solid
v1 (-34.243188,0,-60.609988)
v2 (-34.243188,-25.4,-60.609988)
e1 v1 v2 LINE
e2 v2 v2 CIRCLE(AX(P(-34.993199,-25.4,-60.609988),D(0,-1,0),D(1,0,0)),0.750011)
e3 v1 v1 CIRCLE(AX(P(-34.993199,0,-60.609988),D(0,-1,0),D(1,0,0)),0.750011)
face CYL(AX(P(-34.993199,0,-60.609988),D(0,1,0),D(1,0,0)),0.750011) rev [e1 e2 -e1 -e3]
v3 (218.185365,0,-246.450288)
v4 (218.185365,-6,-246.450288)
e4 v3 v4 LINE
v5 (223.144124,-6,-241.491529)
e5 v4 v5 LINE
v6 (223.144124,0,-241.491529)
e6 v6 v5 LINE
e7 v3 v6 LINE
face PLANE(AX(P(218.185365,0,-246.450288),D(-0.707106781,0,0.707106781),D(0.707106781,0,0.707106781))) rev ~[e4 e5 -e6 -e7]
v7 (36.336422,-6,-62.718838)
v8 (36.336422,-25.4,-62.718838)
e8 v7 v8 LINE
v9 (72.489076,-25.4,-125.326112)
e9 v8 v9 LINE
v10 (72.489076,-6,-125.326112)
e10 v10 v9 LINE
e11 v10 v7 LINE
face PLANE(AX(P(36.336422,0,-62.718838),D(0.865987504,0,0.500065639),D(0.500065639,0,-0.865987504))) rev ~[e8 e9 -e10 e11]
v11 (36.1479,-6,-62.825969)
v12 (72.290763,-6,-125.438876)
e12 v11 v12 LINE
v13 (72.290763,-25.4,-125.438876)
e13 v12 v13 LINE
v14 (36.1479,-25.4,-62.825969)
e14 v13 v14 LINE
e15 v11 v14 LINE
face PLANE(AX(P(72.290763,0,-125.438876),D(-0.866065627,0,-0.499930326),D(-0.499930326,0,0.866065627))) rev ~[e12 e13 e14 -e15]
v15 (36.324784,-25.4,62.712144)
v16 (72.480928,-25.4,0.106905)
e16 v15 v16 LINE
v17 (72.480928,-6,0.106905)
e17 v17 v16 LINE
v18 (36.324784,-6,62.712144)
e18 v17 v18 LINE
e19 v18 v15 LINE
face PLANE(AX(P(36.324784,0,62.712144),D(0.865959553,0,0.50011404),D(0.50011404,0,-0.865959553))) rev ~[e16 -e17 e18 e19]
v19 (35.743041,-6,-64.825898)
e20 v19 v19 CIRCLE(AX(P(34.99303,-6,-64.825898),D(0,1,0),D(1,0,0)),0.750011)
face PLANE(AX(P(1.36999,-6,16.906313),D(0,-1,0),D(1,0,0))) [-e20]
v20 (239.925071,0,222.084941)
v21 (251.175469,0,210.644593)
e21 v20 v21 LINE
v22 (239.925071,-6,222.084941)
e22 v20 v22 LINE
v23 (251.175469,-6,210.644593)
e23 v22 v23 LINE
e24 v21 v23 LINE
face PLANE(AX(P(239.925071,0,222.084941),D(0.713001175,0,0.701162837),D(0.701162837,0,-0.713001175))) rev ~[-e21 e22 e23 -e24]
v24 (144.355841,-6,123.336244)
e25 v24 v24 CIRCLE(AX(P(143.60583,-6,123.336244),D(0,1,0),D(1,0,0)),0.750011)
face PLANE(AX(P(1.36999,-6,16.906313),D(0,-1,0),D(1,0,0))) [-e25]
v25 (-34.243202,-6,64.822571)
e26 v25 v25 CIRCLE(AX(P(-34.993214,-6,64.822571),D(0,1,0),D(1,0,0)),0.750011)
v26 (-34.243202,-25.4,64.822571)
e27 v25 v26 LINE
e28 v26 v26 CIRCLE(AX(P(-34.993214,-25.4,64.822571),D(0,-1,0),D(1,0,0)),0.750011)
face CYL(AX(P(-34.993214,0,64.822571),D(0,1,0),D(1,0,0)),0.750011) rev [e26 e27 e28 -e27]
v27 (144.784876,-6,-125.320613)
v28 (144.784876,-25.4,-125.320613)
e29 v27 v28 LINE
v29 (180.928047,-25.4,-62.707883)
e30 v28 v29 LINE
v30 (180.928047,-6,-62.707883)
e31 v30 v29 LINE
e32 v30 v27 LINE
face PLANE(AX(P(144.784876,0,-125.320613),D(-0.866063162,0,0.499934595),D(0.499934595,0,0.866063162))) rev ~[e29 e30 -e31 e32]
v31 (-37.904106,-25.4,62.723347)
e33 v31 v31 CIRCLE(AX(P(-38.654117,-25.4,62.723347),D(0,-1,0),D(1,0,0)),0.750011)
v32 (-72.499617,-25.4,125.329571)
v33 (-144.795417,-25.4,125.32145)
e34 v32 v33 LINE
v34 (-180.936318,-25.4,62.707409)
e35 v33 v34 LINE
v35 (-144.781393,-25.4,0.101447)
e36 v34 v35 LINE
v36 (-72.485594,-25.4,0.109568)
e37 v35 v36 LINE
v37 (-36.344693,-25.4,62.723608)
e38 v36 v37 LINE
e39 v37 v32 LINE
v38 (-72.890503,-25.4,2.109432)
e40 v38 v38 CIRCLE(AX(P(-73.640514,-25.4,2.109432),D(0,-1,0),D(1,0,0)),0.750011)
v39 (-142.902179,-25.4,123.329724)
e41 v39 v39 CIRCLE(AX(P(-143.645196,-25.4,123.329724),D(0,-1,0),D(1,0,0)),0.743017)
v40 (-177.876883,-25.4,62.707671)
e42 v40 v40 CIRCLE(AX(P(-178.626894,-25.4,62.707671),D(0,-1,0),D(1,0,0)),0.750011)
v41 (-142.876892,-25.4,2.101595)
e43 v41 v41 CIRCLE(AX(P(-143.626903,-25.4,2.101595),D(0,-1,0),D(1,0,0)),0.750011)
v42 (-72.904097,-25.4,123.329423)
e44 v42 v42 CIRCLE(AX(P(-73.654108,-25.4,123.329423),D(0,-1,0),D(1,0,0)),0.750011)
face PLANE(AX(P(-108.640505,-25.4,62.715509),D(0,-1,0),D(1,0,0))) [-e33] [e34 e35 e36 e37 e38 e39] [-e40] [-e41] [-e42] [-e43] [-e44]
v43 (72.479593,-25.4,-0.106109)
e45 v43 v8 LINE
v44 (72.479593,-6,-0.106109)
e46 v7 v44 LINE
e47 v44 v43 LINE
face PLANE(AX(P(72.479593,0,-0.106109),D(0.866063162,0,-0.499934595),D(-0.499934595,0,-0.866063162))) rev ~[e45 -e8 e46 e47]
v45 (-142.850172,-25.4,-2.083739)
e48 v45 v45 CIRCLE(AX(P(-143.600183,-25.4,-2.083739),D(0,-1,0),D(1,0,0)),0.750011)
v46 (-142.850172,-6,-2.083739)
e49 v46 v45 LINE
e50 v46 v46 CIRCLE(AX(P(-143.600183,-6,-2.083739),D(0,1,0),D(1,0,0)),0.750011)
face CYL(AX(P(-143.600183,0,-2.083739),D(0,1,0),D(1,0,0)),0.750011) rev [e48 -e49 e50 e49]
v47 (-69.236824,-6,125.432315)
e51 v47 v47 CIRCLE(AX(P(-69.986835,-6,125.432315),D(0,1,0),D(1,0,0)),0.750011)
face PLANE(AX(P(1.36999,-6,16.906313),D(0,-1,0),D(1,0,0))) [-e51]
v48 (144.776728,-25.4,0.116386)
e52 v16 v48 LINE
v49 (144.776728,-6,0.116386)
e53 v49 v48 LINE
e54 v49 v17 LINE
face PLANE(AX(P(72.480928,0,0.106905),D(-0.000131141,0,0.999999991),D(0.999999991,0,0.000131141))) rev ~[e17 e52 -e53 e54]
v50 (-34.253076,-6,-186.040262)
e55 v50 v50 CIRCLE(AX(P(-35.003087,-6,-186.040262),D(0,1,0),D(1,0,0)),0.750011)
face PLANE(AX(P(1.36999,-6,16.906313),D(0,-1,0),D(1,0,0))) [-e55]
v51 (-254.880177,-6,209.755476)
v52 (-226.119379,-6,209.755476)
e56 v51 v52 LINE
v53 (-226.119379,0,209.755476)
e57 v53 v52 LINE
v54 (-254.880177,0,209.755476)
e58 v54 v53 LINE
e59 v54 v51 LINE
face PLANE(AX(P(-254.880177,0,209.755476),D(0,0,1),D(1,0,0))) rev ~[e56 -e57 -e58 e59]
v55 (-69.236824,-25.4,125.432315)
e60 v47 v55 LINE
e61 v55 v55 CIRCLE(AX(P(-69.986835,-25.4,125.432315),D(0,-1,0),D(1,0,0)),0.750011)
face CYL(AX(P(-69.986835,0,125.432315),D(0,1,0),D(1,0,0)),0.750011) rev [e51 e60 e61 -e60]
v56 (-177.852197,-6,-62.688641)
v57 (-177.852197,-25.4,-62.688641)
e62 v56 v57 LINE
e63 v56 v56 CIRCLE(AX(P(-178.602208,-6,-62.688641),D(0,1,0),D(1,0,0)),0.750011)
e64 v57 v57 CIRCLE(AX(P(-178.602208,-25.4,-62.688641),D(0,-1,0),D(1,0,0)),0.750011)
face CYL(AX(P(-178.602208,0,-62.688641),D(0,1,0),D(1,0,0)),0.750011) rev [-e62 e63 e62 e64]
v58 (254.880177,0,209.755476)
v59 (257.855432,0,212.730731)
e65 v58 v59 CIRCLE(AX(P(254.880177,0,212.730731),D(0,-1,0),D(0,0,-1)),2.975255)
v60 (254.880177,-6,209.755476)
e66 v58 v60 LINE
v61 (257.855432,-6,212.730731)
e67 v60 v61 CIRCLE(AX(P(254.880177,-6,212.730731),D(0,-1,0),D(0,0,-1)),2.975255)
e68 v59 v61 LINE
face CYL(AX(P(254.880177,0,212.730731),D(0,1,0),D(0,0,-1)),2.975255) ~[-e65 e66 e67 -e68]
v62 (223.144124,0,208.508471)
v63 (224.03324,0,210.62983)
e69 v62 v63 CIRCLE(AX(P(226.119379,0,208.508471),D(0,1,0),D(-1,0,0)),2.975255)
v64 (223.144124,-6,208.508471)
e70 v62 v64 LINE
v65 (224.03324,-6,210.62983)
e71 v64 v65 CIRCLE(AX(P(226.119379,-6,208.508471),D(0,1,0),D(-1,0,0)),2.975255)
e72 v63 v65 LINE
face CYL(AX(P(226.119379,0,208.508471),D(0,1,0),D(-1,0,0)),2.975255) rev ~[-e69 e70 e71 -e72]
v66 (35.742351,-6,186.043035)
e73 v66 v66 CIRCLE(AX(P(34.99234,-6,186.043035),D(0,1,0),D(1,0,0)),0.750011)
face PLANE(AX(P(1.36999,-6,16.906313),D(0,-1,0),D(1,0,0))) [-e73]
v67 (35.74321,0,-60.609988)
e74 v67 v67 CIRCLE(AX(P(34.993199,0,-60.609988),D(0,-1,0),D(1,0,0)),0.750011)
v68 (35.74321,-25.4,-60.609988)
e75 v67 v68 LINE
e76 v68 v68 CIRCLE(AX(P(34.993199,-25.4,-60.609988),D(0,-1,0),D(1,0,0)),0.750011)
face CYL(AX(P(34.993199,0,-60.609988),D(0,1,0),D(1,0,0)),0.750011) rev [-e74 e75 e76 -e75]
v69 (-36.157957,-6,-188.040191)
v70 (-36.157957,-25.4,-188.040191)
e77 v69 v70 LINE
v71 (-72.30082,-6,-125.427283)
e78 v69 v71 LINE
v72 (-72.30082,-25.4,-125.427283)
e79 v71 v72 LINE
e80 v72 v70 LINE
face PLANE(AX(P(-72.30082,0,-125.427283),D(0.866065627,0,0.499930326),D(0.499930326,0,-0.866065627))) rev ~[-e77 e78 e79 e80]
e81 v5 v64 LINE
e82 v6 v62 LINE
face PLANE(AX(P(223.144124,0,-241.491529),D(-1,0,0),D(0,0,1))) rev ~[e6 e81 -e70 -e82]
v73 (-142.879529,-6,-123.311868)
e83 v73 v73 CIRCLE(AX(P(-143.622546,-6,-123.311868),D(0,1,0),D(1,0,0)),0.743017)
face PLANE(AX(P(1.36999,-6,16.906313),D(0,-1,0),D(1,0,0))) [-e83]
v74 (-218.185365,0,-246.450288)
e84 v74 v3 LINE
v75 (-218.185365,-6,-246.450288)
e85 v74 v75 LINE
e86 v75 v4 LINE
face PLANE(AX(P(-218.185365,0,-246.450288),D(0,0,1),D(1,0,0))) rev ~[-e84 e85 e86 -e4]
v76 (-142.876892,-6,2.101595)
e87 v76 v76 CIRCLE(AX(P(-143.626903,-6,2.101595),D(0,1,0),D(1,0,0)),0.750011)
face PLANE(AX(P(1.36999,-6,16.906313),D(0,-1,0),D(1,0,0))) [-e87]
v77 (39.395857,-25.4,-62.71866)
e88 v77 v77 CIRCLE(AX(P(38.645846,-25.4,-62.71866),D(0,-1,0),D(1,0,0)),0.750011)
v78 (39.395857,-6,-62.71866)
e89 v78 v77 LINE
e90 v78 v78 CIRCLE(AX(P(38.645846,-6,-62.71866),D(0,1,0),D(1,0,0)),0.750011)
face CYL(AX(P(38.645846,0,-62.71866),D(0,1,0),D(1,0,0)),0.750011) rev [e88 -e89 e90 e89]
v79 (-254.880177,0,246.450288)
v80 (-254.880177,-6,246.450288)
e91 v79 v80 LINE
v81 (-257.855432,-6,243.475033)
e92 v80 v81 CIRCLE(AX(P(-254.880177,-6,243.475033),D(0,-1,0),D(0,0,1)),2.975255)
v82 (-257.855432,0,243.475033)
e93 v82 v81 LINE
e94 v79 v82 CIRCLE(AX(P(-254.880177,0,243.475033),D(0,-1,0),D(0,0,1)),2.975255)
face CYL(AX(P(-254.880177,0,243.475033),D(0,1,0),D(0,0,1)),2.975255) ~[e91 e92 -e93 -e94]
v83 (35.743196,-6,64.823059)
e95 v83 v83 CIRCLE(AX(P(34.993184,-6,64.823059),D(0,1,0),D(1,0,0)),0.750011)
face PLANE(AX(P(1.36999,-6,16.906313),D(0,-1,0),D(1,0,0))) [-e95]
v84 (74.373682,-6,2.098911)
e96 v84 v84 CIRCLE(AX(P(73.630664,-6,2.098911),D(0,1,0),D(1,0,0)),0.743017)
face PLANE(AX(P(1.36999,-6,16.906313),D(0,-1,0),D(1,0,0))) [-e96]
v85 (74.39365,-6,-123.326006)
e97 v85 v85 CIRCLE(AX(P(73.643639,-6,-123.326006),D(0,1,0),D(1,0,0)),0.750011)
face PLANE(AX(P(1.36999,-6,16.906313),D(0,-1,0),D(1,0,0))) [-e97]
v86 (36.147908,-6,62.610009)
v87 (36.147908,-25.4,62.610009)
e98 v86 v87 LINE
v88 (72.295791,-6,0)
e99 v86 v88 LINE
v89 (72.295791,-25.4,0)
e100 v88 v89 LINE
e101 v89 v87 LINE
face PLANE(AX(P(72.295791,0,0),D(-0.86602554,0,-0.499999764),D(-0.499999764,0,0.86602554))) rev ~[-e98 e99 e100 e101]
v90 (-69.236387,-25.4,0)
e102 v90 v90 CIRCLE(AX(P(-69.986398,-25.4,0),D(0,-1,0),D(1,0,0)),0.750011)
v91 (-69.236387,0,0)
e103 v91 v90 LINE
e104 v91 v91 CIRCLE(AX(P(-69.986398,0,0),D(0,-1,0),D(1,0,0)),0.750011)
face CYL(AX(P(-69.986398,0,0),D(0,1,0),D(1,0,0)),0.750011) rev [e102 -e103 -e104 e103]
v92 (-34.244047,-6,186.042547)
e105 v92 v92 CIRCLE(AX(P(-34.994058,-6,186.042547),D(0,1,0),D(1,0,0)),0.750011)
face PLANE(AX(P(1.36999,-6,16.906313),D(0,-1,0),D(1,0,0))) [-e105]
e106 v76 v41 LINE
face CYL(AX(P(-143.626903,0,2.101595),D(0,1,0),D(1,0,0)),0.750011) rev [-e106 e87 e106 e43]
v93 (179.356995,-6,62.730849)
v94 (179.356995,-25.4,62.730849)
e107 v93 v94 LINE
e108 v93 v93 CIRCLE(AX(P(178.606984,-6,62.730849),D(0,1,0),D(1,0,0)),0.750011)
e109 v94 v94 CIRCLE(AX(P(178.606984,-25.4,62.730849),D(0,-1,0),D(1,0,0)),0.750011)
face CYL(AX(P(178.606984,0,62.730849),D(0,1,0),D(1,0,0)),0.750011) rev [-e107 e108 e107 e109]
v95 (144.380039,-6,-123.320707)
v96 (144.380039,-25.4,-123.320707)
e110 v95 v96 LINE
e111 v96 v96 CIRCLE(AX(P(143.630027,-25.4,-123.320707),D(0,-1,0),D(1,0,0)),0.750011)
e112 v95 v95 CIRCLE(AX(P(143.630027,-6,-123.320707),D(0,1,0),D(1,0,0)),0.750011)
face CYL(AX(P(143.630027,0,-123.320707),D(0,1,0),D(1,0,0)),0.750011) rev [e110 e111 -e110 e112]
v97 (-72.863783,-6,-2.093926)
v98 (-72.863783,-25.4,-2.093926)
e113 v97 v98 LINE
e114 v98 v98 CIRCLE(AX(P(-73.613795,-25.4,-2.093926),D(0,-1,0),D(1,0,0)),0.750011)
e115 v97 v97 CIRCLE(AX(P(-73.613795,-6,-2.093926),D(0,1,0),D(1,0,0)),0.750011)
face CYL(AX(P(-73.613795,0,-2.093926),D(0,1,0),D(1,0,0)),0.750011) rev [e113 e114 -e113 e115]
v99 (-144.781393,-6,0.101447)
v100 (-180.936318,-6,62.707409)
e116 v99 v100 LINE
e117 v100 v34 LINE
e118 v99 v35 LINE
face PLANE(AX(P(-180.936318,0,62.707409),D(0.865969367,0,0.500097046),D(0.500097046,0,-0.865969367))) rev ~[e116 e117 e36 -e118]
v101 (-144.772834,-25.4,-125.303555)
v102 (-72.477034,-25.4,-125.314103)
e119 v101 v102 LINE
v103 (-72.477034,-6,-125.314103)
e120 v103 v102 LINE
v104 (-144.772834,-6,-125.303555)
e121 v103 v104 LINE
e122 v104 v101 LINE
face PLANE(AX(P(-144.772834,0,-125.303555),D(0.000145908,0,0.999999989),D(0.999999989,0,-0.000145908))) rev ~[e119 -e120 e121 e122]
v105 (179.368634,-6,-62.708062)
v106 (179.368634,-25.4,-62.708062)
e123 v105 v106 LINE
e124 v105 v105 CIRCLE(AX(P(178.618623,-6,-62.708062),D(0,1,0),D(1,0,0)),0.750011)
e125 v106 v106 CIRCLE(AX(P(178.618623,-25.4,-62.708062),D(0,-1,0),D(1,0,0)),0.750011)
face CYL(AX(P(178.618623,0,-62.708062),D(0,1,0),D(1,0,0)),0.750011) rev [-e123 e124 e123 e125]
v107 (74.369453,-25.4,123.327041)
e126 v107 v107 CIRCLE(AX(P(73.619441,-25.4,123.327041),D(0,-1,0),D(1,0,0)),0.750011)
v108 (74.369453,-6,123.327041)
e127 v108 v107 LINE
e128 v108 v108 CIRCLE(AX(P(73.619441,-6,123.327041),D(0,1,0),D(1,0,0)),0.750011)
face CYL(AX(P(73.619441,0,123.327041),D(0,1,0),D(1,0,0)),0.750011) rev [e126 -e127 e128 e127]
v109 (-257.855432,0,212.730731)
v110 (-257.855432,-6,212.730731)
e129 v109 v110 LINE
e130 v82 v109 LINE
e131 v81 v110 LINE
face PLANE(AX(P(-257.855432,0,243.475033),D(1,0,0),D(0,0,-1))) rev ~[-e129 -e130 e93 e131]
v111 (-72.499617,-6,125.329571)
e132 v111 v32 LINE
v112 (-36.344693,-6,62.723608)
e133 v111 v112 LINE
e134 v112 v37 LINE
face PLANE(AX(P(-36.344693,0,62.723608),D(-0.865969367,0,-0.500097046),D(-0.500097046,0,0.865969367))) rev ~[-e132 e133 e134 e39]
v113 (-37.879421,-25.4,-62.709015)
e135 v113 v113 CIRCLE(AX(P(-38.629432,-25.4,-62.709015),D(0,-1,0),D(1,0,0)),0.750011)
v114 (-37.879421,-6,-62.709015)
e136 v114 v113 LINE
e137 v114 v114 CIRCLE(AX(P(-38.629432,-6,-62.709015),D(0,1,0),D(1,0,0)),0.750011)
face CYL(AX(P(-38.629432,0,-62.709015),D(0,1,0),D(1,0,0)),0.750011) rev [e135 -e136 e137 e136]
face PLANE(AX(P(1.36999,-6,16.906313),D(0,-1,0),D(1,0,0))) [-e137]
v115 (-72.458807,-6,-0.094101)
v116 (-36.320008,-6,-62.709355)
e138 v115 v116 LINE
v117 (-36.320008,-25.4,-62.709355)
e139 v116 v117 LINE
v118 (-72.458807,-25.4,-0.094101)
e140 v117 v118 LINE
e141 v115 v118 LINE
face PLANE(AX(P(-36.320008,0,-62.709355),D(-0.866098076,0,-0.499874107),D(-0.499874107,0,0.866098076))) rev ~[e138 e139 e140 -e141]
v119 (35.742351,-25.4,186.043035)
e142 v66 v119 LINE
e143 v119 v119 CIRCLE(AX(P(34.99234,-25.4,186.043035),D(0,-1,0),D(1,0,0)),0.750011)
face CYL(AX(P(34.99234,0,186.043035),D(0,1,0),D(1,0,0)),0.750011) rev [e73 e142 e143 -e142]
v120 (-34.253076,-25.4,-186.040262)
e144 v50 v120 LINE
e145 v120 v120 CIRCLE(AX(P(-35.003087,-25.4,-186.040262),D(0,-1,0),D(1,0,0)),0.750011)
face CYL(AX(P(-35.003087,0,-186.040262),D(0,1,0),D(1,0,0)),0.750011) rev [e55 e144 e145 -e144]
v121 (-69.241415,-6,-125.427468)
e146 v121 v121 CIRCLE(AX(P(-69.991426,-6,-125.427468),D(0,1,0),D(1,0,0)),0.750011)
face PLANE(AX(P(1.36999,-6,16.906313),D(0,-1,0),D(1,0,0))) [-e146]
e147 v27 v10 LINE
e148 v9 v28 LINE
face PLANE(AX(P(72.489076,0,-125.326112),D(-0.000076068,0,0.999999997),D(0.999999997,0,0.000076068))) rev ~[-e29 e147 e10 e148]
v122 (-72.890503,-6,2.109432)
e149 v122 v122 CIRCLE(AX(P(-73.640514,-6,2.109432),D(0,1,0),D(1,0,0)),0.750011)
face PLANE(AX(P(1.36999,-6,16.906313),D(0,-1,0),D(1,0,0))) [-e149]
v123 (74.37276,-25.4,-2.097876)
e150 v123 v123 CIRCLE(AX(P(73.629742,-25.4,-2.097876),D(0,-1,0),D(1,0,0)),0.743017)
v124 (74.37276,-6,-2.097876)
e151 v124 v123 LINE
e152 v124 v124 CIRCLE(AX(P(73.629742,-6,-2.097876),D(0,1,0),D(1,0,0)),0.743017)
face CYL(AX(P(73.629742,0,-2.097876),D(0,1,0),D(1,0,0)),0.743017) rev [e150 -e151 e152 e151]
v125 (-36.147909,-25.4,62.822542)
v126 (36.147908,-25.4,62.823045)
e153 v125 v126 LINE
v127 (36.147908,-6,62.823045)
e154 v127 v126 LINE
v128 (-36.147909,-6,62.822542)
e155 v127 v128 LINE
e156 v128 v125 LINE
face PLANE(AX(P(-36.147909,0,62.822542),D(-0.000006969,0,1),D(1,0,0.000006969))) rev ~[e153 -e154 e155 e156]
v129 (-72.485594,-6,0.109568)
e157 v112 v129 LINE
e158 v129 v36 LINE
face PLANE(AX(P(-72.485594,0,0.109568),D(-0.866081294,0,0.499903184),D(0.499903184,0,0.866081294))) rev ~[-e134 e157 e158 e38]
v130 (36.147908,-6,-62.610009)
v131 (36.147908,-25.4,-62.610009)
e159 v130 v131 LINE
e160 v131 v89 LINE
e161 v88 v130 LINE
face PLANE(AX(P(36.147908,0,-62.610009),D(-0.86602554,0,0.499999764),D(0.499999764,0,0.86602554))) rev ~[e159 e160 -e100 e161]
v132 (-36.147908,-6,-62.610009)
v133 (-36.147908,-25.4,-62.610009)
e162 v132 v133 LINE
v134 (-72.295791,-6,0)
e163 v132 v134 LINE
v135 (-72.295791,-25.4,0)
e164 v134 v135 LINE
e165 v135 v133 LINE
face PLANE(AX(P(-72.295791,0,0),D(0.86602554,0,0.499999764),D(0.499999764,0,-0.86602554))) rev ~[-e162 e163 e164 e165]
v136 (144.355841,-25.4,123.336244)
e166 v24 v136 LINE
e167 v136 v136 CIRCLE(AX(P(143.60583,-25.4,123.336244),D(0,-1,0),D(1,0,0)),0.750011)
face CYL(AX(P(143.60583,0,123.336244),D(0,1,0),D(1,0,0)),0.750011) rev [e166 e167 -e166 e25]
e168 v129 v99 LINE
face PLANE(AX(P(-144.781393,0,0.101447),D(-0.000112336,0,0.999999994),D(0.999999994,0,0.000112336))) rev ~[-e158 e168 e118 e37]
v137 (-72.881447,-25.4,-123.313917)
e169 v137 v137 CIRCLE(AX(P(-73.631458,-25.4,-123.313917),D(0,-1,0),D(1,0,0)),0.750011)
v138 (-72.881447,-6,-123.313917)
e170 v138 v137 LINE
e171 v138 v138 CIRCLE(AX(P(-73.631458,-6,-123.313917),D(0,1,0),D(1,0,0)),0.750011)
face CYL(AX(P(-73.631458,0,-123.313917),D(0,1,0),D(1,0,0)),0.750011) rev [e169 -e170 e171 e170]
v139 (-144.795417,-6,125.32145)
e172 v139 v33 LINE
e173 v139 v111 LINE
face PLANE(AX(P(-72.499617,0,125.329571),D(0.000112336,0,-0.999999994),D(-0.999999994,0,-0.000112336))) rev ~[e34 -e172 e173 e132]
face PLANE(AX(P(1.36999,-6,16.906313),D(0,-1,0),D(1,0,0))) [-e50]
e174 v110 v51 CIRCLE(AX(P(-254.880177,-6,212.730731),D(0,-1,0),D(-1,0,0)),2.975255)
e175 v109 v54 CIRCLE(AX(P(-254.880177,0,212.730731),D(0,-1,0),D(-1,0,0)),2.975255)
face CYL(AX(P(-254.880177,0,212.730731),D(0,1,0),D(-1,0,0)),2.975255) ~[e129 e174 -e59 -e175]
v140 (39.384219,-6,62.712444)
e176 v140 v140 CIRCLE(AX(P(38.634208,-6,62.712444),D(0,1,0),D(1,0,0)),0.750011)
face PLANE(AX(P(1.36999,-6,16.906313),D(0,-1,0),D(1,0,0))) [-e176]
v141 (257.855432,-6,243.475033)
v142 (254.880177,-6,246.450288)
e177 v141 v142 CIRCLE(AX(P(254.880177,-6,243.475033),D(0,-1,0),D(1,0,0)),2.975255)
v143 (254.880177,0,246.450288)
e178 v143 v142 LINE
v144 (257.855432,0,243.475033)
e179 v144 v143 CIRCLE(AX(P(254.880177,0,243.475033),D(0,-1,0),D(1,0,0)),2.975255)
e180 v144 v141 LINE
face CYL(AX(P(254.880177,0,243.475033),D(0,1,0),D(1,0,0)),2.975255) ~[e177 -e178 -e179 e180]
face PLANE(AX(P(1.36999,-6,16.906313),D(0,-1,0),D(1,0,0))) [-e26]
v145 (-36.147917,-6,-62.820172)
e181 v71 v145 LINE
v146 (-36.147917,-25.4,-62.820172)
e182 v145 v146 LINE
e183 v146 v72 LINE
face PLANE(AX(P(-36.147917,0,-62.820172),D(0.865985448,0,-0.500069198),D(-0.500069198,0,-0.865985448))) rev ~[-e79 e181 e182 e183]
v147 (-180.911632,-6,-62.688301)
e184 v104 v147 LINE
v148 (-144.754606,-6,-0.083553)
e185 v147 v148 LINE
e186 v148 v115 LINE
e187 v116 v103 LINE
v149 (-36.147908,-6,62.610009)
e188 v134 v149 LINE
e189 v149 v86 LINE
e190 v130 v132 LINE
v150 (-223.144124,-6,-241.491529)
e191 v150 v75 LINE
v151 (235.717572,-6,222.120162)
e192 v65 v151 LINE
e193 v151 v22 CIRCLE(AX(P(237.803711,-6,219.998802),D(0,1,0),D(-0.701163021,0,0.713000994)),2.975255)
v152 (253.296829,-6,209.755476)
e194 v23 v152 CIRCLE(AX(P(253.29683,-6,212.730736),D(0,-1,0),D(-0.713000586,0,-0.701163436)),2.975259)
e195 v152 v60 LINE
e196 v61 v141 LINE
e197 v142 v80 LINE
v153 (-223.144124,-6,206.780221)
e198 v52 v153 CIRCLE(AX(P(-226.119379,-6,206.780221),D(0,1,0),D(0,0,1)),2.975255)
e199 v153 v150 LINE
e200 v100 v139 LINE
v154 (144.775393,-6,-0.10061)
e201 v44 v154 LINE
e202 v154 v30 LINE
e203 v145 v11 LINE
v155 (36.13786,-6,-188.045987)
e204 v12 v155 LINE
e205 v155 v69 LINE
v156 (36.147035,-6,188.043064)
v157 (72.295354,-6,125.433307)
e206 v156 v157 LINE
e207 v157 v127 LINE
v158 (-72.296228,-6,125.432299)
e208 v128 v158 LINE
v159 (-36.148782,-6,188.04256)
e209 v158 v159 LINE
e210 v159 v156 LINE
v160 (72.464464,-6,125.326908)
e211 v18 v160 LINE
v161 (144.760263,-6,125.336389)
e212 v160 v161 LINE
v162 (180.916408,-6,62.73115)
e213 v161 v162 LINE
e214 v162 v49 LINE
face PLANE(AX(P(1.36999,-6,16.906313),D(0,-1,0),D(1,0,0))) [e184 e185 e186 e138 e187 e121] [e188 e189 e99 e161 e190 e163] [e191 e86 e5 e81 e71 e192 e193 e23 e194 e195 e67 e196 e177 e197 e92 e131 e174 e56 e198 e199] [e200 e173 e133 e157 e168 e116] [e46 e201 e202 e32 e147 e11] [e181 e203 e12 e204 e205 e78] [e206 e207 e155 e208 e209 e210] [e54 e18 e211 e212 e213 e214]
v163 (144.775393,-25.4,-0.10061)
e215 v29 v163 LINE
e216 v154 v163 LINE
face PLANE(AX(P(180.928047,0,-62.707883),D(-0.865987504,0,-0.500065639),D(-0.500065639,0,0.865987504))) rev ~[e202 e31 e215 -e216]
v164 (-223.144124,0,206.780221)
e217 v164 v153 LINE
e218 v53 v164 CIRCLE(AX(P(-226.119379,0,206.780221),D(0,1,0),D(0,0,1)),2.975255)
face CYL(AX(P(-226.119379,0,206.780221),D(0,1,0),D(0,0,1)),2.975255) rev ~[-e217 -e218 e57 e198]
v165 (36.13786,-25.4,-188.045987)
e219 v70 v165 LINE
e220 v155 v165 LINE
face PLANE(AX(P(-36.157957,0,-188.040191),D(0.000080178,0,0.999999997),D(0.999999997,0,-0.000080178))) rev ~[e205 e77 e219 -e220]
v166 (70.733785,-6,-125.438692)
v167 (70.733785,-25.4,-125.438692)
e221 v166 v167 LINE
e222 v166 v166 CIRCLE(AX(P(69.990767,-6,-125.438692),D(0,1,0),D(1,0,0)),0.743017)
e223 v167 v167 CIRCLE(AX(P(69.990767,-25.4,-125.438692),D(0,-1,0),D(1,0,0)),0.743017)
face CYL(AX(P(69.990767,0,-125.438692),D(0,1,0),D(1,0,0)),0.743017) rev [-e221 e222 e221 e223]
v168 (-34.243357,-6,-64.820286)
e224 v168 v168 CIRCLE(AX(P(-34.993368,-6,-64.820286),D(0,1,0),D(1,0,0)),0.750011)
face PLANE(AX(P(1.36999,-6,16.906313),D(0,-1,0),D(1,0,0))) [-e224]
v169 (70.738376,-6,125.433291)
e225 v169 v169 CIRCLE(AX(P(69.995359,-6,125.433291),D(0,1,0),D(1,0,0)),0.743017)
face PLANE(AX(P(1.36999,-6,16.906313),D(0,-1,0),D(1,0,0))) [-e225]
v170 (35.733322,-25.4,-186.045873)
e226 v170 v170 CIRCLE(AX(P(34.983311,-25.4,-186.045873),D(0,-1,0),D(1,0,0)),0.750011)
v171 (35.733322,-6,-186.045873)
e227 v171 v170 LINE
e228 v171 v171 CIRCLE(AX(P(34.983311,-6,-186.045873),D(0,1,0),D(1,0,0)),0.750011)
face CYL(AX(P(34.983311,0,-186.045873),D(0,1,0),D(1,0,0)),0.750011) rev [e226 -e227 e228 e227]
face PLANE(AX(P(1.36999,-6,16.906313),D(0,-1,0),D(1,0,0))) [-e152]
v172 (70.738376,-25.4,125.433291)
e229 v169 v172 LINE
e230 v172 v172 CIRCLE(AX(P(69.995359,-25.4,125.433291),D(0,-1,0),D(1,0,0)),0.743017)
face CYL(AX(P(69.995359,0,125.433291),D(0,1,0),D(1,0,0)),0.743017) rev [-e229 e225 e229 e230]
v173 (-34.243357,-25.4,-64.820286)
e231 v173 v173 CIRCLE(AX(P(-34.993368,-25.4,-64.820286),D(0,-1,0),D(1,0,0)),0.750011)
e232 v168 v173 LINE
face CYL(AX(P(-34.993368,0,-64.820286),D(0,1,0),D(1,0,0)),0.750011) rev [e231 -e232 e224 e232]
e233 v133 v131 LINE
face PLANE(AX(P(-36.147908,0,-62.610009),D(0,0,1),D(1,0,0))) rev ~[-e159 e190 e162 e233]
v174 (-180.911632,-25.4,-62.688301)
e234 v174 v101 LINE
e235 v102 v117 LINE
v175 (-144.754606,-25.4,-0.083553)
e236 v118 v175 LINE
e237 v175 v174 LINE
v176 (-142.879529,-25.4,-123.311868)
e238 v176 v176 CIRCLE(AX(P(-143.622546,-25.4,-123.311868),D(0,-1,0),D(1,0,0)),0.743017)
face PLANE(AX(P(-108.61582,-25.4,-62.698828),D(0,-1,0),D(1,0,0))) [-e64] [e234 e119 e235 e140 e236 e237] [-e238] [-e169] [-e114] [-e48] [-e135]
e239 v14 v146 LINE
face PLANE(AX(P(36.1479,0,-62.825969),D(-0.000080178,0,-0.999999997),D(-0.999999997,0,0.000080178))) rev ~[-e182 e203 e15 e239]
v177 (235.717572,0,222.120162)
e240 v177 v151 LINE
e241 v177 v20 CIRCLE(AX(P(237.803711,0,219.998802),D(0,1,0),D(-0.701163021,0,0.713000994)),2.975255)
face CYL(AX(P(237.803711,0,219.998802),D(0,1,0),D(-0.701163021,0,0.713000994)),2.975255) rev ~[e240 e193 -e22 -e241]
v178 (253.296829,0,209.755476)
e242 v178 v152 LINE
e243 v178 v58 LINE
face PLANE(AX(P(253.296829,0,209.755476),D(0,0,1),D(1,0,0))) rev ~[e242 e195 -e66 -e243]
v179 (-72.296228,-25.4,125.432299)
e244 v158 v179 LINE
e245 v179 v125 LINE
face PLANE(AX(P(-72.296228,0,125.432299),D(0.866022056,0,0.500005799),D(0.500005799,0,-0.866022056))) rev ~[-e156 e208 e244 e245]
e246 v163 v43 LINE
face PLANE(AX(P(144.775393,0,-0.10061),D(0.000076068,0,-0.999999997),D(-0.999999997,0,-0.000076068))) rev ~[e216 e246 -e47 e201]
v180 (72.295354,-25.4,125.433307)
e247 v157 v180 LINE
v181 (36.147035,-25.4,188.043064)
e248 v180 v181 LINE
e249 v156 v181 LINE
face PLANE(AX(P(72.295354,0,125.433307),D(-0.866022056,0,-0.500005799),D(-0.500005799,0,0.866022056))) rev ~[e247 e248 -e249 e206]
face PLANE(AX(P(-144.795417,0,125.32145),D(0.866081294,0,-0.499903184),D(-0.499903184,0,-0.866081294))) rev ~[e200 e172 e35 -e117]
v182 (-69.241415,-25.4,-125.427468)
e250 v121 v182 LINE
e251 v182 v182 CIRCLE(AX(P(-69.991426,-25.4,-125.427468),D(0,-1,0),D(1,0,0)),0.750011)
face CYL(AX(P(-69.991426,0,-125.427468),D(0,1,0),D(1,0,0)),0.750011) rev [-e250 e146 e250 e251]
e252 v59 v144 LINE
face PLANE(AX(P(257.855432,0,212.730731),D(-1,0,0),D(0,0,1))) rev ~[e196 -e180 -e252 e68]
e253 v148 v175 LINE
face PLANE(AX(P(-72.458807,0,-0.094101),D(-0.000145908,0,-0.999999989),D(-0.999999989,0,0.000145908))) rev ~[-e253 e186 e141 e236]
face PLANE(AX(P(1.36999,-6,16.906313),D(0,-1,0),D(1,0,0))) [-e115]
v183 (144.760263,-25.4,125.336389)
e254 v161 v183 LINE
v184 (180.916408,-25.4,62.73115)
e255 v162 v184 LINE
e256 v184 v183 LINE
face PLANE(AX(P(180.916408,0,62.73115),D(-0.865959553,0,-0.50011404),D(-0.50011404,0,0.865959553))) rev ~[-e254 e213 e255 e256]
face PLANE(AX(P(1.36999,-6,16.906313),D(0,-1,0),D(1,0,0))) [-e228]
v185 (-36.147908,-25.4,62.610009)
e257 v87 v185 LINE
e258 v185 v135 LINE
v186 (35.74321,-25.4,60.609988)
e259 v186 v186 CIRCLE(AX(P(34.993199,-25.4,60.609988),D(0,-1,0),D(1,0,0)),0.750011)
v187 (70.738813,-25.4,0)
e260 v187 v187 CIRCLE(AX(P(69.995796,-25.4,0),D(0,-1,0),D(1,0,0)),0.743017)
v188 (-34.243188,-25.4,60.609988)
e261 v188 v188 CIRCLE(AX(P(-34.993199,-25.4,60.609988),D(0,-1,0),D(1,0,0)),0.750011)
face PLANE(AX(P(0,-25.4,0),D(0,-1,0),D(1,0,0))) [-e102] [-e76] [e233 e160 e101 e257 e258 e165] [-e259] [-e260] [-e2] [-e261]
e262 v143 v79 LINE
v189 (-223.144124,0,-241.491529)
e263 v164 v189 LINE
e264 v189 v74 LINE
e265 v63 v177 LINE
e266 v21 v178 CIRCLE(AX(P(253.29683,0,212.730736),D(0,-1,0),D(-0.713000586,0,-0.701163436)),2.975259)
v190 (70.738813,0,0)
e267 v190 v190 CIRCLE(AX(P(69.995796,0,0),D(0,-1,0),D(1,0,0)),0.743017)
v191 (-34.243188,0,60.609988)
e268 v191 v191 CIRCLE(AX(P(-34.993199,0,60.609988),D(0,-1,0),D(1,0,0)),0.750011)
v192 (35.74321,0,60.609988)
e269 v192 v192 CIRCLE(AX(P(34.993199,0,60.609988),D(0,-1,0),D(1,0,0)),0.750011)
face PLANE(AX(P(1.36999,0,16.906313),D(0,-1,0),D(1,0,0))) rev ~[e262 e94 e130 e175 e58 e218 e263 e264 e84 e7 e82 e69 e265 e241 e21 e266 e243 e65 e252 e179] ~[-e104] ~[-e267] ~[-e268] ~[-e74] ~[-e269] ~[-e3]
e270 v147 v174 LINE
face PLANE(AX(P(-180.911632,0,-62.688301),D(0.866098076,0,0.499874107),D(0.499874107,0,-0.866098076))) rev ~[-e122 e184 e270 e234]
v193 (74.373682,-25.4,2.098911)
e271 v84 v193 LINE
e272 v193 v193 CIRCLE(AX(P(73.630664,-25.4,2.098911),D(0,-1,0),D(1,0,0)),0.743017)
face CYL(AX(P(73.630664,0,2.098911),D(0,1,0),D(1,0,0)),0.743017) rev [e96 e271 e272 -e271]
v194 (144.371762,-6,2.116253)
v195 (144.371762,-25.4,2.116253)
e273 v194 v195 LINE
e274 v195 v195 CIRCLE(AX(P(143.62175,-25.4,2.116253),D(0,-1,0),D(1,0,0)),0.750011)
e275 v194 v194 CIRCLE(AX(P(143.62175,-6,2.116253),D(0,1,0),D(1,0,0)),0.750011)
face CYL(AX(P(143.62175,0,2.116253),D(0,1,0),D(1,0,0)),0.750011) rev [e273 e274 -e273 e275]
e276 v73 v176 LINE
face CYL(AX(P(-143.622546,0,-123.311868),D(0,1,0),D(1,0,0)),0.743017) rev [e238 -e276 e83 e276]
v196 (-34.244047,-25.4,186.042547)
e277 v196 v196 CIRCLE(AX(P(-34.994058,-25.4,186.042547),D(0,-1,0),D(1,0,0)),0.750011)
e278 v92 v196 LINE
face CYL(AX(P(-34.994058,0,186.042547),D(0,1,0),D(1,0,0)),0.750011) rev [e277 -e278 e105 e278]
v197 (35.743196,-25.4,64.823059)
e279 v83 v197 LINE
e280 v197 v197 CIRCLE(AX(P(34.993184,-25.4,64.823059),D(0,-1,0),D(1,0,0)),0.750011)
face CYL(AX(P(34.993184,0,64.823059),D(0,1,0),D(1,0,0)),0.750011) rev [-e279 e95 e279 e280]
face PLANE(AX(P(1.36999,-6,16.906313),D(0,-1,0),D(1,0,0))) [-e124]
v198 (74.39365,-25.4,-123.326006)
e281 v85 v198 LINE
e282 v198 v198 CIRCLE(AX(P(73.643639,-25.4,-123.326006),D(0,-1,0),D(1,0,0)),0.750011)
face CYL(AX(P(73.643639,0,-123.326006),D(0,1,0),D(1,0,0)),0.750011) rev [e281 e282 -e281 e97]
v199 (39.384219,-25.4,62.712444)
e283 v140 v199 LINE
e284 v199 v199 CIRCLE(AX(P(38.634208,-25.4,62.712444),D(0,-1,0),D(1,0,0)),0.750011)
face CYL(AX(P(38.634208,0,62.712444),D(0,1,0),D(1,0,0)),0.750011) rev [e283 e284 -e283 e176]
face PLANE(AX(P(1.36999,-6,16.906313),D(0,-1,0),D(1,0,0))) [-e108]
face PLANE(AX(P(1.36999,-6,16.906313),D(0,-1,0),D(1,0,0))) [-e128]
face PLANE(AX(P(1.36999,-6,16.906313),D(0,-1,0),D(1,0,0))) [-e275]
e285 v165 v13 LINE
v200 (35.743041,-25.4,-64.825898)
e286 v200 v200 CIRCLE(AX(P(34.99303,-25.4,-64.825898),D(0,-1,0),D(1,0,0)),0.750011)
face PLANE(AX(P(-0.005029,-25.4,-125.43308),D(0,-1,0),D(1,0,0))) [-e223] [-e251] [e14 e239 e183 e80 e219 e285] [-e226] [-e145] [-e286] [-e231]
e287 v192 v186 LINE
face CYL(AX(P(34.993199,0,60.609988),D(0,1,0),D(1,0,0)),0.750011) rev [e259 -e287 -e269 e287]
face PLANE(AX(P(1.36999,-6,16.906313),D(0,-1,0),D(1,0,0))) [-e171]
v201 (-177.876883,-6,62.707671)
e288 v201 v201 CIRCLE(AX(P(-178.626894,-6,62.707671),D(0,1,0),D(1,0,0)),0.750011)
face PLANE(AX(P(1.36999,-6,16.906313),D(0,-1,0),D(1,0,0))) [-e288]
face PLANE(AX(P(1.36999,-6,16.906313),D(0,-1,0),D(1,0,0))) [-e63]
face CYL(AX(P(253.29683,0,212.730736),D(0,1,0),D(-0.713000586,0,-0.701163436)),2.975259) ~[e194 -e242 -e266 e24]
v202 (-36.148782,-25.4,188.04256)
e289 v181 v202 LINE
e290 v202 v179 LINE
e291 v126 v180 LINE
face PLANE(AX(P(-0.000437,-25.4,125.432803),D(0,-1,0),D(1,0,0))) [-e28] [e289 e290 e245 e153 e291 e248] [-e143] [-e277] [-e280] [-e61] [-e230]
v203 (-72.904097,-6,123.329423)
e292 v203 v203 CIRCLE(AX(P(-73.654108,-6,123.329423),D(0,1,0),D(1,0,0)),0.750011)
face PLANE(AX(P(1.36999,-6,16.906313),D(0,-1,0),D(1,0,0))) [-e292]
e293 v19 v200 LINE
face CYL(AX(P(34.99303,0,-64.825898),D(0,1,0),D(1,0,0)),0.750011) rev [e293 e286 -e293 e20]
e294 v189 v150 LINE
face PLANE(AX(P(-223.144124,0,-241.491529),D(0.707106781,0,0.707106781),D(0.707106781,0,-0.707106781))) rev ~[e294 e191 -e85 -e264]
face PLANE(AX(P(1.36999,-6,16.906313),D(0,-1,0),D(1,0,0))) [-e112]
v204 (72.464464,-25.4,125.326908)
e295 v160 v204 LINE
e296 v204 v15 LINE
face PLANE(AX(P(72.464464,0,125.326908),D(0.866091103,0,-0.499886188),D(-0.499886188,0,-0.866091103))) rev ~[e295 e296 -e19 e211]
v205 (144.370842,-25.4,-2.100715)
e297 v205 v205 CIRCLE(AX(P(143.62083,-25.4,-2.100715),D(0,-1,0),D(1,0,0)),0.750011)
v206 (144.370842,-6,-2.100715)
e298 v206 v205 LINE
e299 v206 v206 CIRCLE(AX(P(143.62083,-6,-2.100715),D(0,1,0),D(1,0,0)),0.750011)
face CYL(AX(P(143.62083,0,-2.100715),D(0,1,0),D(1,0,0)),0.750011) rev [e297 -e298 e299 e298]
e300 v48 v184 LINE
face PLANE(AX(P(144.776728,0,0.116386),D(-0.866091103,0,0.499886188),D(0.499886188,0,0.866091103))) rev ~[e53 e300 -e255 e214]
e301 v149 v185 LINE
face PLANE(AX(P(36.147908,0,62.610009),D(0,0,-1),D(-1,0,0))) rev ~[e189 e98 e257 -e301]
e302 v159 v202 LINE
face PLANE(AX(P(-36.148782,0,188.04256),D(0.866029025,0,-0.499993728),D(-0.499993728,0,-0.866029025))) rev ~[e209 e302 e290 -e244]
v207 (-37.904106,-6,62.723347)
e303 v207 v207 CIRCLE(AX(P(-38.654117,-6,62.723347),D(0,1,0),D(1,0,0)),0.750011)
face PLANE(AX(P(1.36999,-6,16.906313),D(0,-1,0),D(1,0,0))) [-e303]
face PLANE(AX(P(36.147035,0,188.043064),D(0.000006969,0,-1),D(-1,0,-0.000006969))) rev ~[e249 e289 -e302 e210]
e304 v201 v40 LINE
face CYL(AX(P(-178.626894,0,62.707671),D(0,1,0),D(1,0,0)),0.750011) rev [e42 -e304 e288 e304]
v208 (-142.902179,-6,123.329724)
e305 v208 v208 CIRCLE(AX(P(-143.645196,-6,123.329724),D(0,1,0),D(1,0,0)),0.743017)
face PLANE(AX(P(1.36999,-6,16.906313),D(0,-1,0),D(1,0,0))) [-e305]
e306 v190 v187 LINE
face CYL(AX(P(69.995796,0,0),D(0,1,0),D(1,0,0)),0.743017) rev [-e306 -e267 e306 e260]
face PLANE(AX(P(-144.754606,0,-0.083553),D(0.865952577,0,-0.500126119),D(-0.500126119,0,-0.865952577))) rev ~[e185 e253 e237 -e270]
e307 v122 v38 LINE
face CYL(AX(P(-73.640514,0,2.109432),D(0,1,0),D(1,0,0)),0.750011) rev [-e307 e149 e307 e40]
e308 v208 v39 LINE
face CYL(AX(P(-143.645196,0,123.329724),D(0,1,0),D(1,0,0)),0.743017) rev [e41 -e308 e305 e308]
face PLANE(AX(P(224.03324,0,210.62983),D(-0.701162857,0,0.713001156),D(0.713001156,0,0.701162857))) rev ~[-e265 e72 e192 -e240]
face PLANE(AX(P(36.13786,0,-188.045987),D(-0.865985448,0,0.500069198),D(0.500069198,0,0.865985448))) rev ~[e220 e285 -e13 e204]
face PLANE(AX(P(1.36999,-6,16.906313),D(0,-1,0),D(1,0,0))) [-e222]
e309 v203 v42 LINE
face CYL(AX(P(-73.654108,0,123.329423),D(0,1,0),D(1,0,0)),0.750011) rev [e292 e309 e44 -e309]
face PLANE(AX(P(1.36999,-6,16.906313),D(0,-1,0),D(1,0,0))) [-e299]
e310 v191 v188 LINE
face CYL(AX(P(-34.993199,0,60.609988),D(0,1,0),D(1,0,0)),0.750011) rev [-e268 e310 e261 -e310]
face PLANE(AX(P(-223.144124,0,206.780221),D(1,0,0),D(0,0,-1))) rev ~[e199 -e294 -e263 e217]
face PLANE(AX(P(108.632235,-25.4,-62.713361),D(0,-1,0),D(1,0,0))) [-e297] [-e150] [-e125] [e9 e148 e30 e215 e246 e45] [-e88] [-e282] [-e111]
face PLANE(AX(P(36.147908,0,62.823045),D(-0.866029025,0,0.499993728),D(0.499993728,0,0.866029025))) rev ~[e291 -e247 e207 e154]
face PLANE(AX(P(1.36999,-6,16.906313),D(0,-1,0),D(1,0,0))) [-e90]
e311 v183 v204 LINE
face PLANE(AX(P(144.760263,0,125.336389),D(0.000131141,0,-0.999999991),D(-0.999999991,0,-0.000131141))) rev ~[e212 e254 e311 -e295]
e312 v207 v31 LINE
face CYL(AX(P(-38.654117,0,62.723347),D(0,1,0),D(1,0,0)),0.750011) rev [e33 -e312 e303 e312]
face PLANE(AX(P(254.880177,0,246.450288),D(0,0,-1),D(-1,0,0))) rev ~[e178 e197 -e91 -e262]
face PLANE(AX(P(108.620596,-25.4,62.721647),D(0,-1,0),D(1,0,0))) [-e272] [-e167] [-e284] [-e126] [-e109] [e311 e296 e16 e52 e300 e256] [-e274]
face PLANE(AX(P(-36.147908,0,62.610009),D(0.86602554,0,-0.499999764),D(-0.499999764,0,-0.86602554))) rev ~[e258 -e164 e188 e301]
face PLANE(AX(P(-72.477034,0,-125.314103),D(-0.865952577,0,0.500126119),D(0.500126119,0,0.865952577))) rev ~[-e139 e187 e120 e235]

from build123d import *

# Parameters (mm, degrees)
F2_DEPTH = 6
F0_R     = 0.7500112
F0_R_2   = 0.7430174238
F3_DEPTH = 25.4


# Not quite as in the source:
# - ends of sketch curves that miss each other by under 0.0002 mm in the source are joined


with BuildPart() as f2:
    # F1 (on face) → F2 (new body)
    with BuildSketch(Plane.XZ):
        with BuildLine():
            Line((239.9250705835, 222.0849408719), (251.1754686974, 210.6445925623))
            ThreePointArc((251.1754686974, 210.6445925623), (252.1467535933, 209.9867437177), (253.2968294671, 209.755476289))
            Line((253.2968294671, 209.755476289), (254.8801768619, 209.755476289))
            ThreePointArc((254.8801768619, 209.755476289), (256.983999836, 210.6269082977), (257.8554318447, 212.7307312719))
            Line((257.8554318447, 212.7307312719), (257.8554318447, 243.475032761))
            ThreePointArc((257.8554318447, 243.475032761), (256.983999836, 245.5788557351), (254.8801768619, 246.4502877439))
            Line((254.8801768619, 246.4502877439), (-254.8801768619, 246.4502877439))
            ThreePointArc((-254.8801768619, 246.4502877439), (-256.983999836, 245.5788557351), (-257.8554318447, 243.475032761))
            Line((-257.8554318447, 243.475032761), (-257.8554318447, 212.7307312719))
            ThreePointArc((-257.8554318447, 212.7307312719), (-256.983999836, 210.6269082977), (-254.8801768619, 209.755476289))
            Line((-254.8801768619, 209.755476289), (-226.1193786946, 209.755476289))
            ThreePointArc((-226.1193786946, 209.755476289), (-224.0155557204, 208.8840442803), (-223.1441237117, 206.7802213062))
            Line((-223.1441237117, 206.7802213062), (-223.1441237117, -241.4915294391))
            Line((-223.1441237117, -241.4915294391), (-218.185365407, -246.4502877439))
            Line((-218.185365407, -246.4502877439), (218.185365407, -246.4502877439))
            Line((218.185365407, -246.4502877439), (223.1441237117, -241.4915294391))
            Line((223.1441237117, -241.4915294391), (223.1441237117, 208.5084705609))
            ThreePointArc((223.1441237117, 208.5084705609), (223.375391006, 209.658546114), (224.0332399627, 210.6298303616))
            Line((224.0332399627, 210.6298303616), (235.7175720959, 222.1201619404))
            ThreePointArc((235.7175720959, 222.1201619404), (237.8286155716, 222.9739529007), (239.9250705835, 222.0849408719))
        make_face()
        Polygon((72.2957914, 0), (36.1479084, -62.6100094), (-36.1479084, -62.6100094), (-72.2957914, 0), (-36.1479084, 62.6100094), (36.1479084, 62.6100094), align=None, mode=Mode.SUBTRACT)
    extrude(amount=F2_DEPTH)

    # F0 (on Front) → F3 (join)
    with BuildSketch(Plane.XZ):
        Polygon((36.1479084, -62.6100094), (72.2957914, 0), (36.1479084, 62.6100094), (-36.1479084, 62.6100094), (-72.2957914, 0), (-36.1479084, -62.6100094), align=None)
        with Locations((-34.993199, -60.609988)):
            Circle(F0_R, mode=Mode.SUBTRACT)
        with Locations((34.993199, -60.609988)):
            Circle(F0_R, mode=Mode.SUBTRACT)
        with Locations((-69.986398, 0)):
            Circle(F0_R, mode=Mode.SUBTRACT)
        with Locations((-34.993199, 60.609988)):
            Circle(F0_R, mode=Mode.SUBTRACT)
        with Locations((69.995796, 0)):
            Circle(F0_R_2, mode=Mode.SUBTRACT)
        with Locations((34.993199, 60.609988)):
            Circle(F0_R, mode=Mode.SUBTRACT)
        Polygon((72.47959348, -0.1061088931), (36.3364219227, -62.7188382077), (72.4890757311, -125.3261121412), (144.7848756936, -125.3206127679), (180.9280472508, -62.7078834532), (144.7753934424, -0.1006095197), align=None)
        with Locations((73.6436387774, -123.3260062512)):
            Circle(F0_R, mode=Mode.SUBTRACT)
        with Locations((143.6300274078, -123.3207069419)):
            Circle(F0_R, mode=Mode.SUBTRACT)
        with Locations((38.6458459563, -62.7186601398)):
            Circle(F0_R, mode=Mode.SUBTRACT)
        with Locations((73.6297421488, -2.0978761685)):
            Circle(F0_R_2, mode=Mode.SUBTRACT)
        with Locations((178.6186232172, -62.7080615211)):
            Circle(F0_R, mode=Mode.SUBTRACT)
        with Locations((143.6208303961, -2.1007154097)):
            Circle(F0_R, mode=Mode.SUBTRACT)
        Polygon((36.1478997424, -62.8259687739), (-36.1479168252, -62.8201722222), (-72.3008196697, -125.4272831471), (-36.1579567466, -188.0401906197), (36.1378598211, -188.0459871714), (72.2907626655, -125.4388762464), align=None)
        with Locations((-35.0030869921, -186.0402618087)):
            Circle(F0_R, mode=Mode.SUBTRACT)
        with Locations((-69.9914262771, -125.4274683102)):
            Circle(F0_R, mode=Mode.SUBTRACT)
        with Locations((-34.9933677872, -64.8202861983)):
            Circle(F0_R, mode=Mode.SUBTRACT)
        with Locations((34.983310783, -186.0458731952)):
            Circle(F0_R, mode=Mode.SUBTRACT)
        with Locations((69.9907672729, -125.4386918368)):
            Circle(F0_R_2, mode=Mode.SUBTRACT)
        with Locations((34.9930299879, -64.8258975849)):
            Circle(F0_R, mode=Mode.SUBTRACT)
        Polygon((-36.3200081195, -62.7093545109), (-72.4588066668, -0.0941010816), (-144.7546060688, -0.0835525132), (-180.91163233, -62.6883013644), (-144.7728337827, -125.3035547937), (-72.4770343807, -125.3141033621), align=None)
        with Locations((-143.6225460101, -123.3118678504)):
            Circle(F0_R_2, mode=Mode.SUBTRACT)
        with Locations((-73.6314577352, -123.3139168414)):
            Circle(F0_R, mode=Mode.SUBTRACT)
        with Locations((-178.6022083144, -62.6886407243)):
            Circle(F0_R, mode=Mode.SUBTRACT)
        with Locations((-143.6001827143, -2.0837390339)):
            Circle(F0_R, mode=Mode.SUBTRACT)
        with Locations((-38.6294321351, -62.709015151)):
            Circle(F0_R, mode=Mode.SUBTRACT)
        with Locations((-73.6137946247, -2.0939262472)):
            Circle(F0_R, mode=Mode.SUBTRACT)
        Polygon((-72.4855936704, 0.1095682125), (-36.3446929989, 62.7236083401), (-72.4996174478, 125.3295710344), (-144.7954171632, 125.3214496097), (-180.9363178347, 62.7074094821), (-144.7813933858, 0.1014467878), align=None)
        with Locations((-143.6269028809, 2.1015945506)):
            Circle(F0_R, mode=Mode.SUBTRACT)
        with Locations((-178.626893809, 62.707671309)):
            Circle(F0_R, mode=Mode.SUBTRACT)
        with Locations((-73.6405144887, 2.1094321527)):
            Circle(F0_R, mode=Mode.SUBTRACT)
        with Locations((-38.6541170246, 62.7233465131)):
            Circle(F0_R, mode=Mode.SUBTRACT)
        with Locations((-143.645196257, 123.3297240496)):
            Circle(F0_R_2, mode=Mode.SUBTRACT)
        with Locations((-73.6541079527, 123.3294232716)):
            Circle(F0_R, mode=Mode.SUBTRACT)
        Polygon((-36.1479091406, 62.8225415071), (36.1479076577, 62.8230453272), (72.2953543359, 125.4333066355), (36.1470350159, 188.0430641241), (-36.1487817824, 188.0425603041), (-72.2962284606, 125.4322989958), align=None)
        with Locations((-34.9932136785, 64.8225709541)):
            Circle(F0_R, mode=Mode.SUBTRACT)
        with Locations((-69.9868350606, 125.4323150896)):
            Circle(F0_R, mode=Mode.SUBTRACT)
        with Locations((-34.9940584445, 186.0425469512)):
            Circle(F0_R, mode=Mode.SUBTRACT)
        with Locations((34.9931843198, 64.8230586801)):
            Circle(F0_R, mode=Mode.SUBTRACT)
        with Locations((69.995358936, 125.4332906071)):
            Circle(F0_R_2, mode=Mode.SUBTRACT)
        with Locations((34.9923395538, 186.0430346772)):
            Circle(F0_R, mode=Mode.SUBTRACT)
        Polygon((36.3247836852, 62.71214389), (72.4809283845, 0.1069051082), (144.7767279344, 0.1163860718), (180.9164081792, 62.7311498147), (144.7602634799, 125.3363885966), (72.46446393, 125.3269076329), align=None)
        with Locations((73.6306643166, 2.098910662)):
            Circle(F0_R_2, mode=Mode.SUBTRACT)
        with Locations((38.6342077061, 62.7124443555)):
            Circle(F0_R, mode=Mode.SUBTRACT)
        with Locations((143.6217504731, 2.116252683)):
            Circle(F0_R, mode=Mode.SUBTRACT)
        with Locations((178.6069841582, 62.7308493493)):
            Circle(F0_R, mode=Mode.SUBTRACT)
        with Locations((73.6194413913, 123.3270410217)):
            Circle(F0_R, mode=Mode.SUBTRACT)
        with Locations((143.6058296174, 123.3362435186)):
            Circle(F0_R, mode=Mode.SUBTRACT)
    extrude(amount=F3_DEPTH)


solid = f2.part
